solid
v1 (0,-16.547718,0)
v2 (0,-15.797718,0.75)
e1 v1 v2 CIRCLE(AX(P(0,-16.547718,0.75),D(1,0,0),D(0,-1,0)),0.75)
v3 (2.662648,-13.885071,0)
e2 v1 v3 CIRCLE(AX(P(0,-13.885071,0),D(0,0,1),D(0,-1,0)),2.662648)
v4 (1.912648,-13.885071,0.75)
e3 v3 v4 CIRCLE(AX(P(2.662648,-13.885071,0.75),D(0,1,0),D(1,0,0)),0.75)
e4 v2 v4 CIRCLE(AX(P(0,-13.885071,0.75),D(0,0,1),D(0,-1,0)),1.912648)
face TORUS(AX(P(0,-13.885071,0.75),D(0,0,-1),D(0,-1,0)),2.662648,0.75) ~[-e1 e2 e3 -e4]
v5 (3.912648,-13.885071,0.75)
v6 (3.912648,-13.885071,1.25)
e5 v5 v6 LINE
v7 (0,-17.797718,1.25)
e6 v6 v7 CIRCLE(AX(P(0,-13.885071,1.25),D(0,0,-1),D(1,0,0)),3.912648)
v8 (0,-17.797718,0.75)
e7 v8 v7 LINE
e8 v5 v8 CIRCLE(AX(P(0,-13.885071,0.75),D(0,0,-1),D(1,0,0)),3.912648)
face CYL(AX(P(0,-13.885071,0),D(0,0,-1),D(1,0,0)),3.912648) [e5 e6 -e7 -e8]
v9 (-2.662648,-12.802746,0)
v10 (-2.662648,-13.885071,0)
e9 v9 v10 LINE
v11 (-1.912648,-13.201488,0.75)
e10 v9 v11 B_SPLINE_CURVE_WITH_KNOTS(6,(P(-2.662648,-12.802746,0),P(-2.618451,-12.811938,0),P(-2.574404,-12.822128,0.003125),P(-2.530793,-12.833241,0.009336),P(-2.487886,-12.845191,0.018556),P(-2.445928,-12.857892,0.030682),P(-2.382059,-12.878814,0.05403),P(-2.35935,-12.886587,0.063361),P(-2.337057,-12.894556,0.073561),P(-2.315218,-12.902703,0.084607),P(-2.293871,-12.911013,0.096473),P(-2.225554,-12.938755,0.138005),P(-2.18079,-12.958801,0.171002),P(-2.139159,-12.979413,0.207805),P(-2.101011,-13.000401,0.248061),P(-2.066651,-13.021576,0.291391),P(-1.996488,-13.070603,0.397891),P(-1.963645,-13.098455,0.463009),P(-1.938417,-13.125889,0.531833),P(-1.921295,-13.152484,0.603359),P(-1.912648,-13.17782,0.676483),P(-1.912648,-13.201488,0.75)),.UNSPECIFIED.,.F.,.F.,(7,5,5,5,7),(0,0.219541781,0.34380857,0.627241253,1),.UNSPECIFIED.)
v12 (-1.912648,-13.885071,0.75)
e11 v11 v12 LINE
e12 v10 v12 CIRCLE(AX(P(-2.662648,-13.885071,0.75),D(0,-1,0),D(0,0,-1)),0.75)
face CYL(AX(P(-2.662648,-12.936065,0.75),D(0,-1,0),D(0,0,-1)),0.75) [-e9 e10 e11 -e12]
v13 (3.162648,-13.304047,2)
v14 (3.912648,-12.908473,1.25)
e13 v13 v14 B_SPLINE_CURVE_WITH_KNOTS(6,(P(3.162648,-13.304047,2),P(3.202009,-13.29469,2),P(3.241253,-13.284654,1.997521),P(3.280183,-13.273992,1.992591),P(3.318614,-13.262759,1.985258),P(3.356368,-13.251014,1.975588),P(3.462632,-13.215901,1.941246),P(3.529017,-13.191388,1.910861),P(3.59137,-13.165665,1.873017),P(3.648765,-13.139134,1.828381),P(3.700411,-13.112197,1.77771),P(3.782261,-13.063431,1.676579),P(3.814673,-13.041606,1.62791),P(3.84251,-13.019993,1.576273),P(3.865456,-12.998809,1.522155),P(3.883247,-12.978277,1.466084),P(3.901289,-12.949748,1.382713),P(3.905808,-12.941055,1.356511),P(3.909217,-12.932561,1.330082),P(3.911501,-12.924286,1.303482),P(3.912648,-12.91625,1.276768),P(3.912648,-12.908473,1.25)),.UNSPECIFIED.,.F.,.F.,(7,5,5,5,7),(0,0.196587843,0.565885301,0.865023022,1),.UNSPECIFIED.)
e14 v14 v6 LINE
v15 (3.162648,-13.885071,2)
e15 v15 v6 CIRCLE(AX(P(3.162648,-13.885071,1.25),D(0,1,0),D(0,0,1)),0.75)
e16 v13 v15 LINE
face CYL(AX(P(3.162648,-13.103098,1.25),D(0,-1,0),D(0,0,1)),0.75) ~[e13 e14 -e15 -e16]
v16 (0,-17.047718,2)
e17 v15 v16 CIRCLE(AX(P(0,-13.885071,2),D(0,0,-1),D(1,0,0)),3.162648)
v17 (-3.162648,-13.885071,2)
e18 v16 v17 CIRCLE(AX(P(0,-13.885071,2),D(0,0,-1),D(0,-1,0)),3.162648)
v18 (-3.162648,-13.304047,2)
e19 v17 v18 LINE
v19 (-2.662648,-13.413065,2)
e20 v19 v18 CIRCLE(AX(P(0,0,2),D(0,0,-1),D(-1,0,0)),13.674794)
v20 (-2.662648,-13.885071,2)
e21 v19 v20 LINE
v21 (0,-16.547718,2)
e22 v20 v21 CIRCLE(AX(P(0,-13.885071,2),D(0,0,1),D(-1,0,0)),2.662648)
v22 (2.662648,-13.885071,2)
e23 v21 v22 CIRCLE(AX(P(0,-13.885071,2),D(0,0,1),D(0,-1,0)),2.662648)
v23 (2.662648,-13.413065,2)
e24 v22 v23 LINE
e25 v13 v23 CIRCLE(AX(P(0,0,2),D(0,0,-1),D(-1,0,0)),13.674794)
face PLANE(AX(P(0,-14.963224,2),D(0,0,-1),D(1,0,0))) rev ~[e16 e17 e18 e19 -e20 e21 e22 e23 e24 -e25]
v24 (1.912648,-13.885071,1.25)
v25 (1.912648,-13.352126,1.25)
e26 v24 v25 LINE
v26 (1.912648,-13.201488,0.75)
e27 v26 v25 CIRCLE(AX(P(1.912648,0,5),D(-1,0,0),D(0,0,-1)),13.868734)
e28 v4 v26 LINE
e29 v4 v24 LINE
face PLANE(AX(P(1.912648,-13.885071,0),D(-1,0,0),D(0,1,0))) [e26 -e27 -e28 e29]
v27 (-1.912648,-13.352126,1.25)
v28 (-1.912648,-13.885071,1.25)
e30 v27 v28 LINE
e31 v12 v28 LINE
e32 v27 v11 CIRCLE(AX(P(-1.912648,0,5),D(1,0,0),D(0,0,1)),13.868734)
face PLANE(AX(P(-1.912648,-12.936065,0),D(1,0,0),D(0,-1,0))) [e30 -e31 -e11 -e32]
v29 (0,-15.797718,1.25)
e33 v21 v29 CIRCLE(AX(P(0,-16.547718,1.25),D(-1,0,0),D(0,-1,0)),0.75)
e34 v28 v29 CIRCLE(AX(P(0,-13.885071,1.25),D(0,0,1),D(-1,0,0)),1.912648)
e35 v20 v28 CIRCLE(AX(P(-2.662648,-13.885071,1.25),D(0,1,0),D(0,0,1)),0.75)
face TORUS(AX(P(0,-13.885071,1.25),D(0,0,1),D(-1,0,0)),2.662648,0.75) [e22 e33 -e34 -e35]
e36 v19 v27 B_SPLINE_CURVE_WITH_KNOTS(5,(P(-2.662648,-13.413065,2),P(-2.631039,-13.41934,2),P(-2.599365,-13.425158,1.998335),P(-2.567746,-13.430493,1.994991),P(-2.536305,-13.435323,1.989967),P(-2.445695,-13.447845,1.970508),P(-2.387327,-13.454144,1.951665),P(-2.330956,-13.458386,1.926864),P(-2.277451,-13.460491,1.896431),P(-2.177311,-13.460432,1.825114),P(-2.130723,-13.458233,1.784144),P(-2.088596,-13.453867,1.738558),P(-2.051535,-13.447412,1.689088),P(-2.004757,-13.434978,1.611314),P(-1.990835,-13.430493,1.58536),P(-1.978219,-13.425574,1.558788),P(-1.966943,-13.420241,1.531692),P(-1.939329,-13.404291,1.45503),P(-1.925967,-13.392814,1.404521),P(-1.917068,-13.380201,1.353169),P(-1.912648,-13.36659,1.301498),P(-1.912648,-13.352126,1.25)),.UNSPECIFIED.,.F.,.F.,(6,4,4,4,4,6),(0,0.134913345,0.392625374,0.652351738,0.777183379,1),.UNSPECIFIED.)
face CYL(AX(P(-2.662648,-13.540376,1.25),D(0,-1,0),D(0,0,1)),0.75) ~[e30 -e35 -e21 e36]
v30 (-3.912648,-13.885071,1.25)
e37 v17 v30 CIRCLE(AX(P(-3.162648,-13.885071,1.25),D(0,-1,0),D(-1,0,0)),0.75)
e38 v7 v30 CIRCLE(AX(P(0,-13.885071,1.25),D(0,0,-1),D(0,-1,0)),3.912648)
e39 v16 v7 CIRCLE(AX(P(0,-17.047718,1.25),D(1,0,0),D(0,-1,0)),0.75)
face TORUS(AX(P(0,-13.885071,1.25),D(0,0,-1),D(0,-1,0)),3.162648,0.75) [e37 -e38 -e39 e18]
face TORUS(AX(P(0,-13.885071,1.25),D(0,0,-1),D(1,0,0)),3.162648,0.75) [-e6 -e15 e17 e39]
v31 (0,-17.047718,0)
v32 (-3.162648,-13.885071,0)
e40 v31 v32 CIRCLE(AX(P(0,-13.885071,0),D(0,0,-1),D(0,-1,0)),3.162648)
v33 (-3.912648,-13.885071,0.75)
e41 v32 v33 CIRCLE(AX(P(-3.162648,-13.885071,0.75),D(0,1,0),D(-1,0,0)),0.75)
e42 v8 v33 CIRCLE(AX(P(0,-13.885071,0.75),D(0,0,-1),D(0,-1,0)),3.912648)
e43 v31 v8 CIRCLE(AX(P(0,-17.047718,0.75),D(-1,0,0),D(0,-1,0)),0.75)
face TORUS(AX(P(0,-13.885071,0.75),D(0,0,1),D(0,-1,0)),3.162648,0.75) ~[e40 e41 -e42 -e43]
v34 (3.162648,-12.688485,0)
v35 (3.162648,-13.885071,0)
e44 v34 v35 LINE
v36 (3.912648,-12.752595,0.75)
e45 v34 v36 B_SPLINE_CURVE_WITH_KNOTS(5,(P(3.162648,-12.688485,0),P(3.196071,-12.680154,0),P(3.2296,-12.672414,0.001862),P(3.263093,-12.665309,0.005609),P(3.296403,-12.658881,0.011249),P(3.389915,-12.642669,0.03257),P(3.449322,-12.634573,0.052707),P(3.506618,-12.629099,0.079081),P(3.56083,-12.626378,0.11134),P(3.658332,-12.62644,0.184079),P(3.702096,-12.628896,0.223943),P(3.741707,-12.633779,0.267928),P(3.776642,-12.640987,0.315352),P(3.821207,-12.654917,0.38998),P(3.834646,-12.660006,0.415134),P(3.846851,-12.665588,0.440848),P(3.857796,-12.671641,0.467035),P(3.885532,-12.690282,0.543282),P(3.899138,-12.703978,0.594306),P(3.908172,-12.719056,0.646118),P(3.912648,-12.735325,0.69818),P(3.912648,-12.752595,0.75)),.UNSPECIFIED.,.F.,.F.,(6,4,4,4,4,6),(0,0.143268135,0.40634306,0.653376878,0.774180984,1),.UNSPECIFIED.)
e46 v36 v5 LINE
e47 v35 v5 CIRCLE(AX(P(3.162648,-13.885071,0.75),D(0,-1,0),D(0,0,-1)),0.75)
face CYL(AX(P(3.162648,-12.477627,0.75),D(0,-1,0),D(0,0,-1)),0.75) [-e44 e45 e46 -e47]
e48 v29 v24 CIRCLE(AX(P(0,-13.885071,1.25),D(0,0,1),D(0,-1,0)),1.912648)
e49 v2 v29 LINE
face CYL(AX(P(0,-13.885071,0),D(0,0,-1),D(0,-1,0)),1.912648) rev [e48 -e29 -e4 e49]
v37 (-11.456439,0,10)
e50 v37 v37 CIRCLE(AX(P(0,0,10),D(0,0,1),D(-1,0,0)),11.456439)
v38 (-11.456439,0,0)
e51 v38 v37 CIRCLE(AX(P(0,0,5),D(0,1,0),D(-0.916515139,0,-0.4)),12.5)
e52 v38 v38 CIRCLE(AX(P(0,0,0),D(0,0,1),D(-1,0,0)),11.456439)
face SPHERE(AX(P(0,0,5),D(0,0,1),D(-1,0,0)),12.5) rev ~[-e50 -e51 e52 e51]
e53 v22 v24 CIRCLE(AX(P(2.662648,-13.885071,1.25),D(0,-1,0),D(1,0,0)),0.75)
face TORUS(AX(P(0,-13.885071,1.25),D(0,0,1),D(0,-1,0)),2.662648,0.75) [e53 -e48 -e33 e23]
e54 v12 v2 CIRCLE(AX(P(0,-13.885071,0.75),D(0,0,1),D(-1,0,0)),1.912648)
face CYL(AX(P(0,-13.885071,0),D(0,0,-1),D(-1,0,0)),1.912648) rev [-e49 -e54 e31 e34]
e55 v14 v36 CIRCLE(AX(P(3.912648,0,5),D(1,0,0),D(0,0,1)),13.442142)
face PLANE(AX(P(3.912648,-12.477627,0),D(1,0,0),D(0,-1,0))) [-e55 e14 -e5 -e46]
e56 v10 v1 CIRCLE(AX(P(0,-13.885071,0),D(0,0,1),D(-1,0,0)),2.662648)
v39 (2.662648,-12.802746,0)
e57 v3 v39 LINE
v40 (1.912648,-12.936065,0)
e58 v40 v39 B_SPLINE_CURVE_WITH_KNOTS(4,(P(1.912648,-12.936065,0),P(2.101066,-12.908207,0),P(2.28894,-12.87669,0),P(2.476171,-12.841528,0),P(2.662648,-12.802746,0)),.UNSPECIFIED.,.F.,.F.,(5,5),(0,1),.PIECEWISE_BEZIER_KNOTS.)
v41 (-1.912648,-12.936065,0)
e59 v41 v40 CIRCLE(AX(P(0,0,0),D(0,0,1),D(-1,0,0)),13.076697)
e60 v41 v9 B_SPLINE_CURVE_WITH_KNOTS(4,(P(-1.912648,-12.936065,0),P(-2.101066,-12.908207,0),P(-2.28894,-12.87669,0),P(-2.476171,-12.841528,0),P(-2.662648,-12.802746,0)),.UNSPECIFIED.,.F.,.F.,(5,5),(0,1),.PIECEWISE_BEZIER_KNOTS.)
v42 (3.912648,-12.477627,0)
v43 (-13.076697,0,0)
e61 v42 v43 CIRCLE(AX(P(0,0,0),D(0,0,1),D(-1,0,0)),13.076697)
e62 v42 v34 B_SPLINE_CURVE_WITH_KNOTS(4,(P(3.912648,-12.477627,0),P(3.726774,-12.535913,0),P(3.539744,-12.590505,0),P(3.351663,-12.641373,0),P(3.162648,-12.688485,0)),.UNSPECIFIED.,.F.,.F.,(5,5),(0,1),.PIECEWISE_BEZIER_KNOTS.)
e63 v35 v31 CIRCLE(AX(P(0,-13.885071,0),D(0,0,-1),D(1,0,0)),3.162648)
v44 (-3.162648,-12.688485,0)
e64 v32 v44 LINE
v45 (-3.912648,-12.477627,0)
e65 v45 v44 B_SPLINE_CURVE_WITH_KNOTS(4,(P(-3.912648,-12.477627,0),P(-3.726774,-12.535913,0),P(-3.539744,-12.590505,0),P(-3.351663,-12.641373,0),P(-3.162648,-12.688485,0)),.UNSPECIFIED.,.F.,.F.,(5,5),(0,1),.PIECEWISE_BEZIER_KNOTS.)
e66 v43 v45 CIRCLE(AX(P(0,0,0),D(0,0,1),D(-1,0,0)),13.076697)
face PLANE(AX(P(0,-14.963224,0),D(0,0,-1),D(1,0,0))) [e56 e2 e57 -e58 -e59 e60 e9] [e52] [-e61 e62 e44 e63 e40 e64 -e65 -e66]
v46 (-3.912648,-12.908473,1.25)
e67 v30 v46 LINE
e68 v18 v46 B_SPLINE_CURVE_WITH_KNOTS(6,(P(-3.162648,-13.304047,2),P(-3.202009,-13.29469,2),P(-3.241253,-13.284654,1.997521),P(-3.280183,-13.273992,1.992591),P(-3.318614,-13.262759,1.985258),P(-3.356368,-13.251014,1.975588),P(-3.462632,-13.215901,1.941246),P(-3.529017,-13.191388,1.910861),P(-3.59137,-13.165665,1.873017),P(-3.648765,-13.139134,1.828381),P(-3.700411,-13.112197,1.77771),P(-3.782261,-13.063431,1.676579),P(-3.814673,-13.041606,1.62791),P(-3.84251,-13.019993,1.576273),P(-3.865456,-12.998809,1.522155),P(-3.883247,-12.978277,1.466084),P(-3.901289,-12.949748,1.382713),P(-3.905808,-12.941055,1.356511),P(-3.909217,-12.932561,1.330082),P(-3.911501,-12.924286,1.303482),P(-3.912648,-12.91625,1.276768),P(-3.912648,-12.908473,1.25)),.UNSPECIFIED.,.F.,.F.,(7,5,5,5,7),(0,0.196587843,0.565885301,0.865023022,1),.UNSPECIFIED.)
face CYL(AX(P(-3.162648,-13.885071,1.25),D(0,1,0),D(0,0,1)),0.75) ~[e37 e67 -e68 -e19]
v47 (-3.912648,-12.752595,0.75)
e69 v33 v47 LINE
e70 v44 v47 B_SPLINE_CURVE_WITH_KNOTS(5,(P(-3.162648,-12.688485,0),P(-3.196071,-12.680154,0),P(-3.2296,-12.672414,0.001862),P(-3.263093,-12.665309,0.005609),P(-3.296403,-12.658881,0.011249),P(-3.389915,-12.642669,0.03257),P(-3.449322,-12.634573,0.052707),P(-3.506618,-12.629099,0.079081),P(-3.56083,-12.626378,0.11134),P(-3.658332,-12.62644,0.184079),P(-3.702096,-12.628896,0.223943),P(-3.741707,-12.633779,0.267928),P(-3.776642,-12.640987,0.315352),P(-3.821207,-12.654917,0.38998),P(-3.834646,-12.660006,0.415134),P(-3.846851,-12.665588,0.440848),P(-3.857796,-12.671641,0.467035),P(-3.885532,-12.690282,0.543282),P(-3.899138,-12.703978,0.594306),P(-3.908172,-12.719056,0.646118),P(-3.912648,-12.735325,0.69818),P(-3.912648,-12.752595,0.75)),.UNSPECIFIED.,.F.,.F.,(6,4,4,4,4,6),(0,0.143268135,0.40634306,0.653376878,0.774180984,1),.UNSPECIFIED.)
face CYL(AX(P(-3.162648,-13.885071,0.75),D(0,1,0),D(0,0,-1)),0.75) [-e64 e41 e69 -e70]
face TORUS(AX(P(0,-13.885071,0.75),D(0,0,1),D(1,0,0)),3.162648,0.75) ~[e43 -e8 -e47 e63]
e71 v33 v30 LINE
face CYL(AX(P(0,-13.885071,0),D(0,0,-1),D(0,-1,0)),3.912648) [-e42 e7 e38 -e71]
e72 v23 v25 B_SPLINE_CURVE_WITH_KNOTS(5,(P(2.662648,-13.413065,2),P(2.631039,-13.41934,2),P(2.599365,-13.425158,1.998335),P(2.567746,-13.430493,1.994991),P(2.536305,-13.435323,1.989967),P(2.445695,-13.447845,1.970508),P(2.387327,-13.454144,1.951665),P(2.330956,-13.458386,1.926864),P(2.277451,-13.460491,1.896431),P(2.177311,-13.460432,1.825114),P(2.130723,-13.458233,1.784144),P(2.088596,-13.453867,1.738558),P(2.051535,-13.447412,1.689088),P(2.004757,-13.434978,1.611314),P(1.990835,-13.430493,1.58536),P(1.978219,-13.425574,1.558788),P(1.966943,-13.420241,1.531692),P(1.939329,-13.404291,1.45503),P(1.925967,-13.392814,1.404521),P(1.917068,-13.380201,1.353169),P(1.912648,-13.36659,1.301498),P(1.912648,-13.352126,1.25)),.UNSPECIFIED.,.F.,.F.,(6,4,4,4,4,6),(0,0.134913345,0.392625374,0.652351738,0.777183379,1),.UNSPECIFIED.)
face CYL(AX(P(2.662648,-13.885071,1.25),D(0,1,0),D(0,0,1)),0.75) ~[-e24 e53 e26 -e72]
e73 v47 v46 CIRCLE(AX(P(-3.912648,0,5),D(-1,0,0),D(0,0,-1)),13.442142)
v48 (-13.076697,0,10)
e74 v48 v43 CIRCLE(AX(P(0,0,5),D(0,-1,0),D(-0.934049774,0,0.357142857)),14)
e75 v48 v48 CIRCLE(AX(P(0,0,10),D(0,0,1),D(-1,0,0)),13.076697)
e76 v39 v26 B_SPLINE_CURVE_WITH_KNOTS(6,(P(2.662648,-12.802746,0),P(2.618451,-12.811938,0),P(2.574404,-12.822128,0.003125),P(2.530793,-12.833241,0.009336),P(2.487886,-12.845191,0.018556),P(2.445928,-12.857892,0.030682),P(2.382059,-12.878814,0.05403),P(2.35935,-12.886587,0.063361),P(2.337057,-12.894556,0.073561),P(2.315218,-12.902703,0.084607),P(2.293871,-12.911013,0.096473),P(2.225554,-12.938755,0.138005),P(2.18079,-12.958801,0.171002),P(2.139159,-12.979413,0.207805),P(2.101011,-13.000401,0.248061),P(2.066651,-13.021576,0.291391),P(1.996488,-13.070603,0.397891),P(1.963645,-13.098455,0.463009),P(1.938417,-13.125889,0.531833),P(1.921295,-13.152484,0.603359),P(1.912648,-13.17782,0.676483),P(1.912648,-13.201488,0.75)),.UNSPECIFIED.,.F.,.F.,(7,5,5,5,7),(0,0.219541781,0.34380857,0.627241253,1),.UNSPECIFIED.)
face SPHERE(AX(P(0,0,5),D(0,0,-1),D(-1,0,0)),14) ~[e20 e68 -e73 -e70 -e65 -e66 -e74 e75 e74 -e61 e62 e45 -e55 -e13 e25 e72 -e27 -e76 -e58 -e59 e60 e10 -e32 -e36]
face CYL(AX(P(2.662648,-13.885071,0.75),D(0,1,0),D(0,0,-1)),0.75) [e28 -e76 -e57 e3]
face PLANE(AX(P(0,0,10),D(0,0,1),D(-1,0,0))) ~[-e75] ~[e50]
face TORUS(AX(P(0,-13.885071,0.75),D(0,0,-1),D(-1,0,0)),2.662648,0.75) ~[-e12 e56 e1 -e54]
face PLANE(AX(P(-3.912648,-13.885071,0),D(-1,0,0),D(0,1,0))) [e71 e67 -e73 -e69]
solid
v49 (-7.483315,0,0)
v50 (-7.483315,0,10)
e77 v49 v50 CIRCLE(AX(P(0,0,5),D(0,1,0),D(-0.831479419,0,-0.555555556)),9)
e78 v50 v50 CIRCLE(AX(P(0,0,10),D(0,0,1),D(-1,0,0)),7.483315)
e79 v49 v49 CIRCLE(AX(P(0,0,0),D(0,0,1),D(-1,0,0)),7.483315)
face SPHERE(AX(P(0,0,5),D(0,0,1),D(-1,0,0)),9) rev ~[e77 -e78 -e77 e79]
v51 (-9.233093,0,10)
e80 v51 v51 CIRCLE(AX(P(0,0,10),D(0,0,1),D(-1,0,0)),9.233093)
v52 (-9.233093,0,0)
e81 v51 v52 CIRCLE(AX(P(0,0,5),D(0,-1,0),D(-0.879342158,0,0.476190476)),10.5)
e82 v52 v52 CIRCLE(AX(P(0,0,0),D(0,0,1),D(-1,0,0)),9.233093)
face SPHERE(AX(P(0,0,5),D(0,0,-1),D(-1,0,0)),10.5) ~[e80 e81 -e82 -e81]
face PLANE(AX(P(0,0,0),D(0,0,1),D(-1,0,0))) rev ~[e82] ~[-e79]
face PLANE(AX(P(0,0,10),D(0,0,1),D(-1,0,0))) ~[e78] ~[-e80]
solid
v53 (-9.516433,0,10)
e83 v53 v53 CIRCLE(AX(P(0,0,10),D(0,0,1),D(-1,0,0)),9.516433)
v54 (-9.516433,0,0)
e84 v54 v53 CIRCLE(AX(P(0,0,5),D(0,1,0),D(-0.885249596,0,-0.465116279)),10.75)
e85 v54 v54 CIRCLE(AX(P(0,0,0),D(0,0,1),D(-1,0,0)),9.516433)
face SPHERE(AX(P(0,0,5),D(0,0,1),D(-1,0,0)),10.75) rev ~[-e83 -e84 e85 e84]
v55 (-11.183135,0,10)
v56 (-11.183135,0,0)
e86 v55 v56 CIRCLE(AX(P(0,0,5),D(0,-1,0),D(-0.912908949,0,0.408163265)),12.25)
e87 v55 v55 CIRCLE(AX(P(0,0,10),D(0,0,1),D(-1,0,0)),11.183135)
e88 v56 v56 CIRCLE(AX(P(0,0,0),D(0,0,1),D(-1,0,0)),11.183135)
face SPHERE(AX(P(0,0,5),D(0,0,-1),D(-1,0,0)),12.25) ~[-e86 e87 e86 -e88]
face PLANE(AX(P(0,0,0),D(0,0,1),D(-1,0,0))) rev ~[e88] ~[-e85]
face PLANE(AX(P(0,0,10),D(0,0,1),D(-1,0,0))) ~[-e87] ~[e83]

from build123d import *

# Parameters (mm, degrees)
F3_DEPTH = 2
F4_R     = 0.75


with BuildPart() as f1:
    # F0 (on Front) → F1 (revolve)
    with BuildSketch(Plane.XZ):
        with BuildLine():
            ThreePointArc((-11.4564392374, 0), (-12.5, 5), (-11.4564392374, 10))
            Line((-11.4564392374, 10), (-13.0766968306, 10))
            ThreePointArc((-13.0766968306, 10), (-14, 5), (-13.0766968306, 0))
            Line((-13.0766968306, 0), (-11.4564392374, 0))
        make_face()
    revolve(axis=Axis((0, 0, 5), (0, 0, 1)))

    # F2 (on face) → F3 (join)
    with BuildSketch(Plane(origin=(0, 0, 0), x_dir=(1, 0, 0), z_dir=(0, 0, -1))):
        with BuildLine():
            Line((-3.9126477204, 13.8850705698), (-3.9126477204, 12.4776274915))
            ThreePointArc((-3.9126477204, 12.4776274915), (-2.9216532973, 12.7461343948), (-1.9126477204, 12.9360650392))
            Line((-1.9126477204, 12.9360650392), (-1.9126477204, 13.8850705698))
            ThreePointArc((-1.9126477204, 13.8850705698), (-1.3524461731, 15.2375167429), (0, 15.7977182902))
            ThreePointArc((0, 15.7977182902), (1.3524461731, 15.2375167429), (1.9126477204, 13.8850705698))
            Line((1.9126477204, 13.8850705698), (1.9126477204, 12.9360650392))
            ThreePointArc((1.9126477204, 12.9360650392), (2.9216532973, 12.7461343948), (3.9126477204, 12.4776274915))
            Line((3.9126477204, 12.4776274915), (3.9126477204, 13.8850705698))
            ThreePointArc((3.9126477204, 13.8850705698), (2.7666597355, 16.6517303053), (0, 17.7977182902))
            ThreePointArc((0, 17.7977182902), (-2.7666597355, 16.6517303053), (-3.9126477204, 13.8850705698))
        make_face()
    extrude(amount=-F3_DEPTH)

    # F4
    f4_edges = [f1.edges().sort_by_distance(p)[0] for p in [
        (0, -17.797718, 2),
        (0, -15.797718, 2),
        (0, -17.797718, 0),
        (0, -15.797718, 0),
    ]]
    fillet(f4_edges, radius=F4_R)


with BuildPart() as f1b:
    # F0 (on Front) → F1, piece 2 (revolve)
    with BuildSketch(Plane.XZ):
        with BuildLine():
            ThreePointArc((-9.5164331553, 0), (-10.75, 5), (-9.5164331553, 10))
            Line((-9.5164331553, 10), (-11.1831346232, 10))
            ThreePointArc((-11.1831346232, 10), (-12.25, 5), (-11.1831346232, 0))
            Line((-11.1831346232, 0), (-9.5164331553, 0))
        make_face()
    revolve(axis=Axis((0, 0, 5), (0, 0, 1)))


with BuildPart() as f1c:
    # F0 (on Front) → F1, piece 3 (revolve)
    with BuildSketch(Plane.XZ):
        with BuildLine():
            ThreePointArc((-7.4833147735, 0), (-9, 5), (-7.4833147735, 10))
            Line((-7.4833147735, 10), (-9.2330926563, 10))
            ThreePointArc((-9.2330926563, 10), (-10.5, 5), (-9.2330926563, 0))
            Line((-9.2330926563, 0), (-7.4833147735, 0))
        make_face()
    revolve(axis=Axis((0, 0, 5), (0, 0, 1)))


solid = Compound([f1.part, f1b.part, f1c.part])
